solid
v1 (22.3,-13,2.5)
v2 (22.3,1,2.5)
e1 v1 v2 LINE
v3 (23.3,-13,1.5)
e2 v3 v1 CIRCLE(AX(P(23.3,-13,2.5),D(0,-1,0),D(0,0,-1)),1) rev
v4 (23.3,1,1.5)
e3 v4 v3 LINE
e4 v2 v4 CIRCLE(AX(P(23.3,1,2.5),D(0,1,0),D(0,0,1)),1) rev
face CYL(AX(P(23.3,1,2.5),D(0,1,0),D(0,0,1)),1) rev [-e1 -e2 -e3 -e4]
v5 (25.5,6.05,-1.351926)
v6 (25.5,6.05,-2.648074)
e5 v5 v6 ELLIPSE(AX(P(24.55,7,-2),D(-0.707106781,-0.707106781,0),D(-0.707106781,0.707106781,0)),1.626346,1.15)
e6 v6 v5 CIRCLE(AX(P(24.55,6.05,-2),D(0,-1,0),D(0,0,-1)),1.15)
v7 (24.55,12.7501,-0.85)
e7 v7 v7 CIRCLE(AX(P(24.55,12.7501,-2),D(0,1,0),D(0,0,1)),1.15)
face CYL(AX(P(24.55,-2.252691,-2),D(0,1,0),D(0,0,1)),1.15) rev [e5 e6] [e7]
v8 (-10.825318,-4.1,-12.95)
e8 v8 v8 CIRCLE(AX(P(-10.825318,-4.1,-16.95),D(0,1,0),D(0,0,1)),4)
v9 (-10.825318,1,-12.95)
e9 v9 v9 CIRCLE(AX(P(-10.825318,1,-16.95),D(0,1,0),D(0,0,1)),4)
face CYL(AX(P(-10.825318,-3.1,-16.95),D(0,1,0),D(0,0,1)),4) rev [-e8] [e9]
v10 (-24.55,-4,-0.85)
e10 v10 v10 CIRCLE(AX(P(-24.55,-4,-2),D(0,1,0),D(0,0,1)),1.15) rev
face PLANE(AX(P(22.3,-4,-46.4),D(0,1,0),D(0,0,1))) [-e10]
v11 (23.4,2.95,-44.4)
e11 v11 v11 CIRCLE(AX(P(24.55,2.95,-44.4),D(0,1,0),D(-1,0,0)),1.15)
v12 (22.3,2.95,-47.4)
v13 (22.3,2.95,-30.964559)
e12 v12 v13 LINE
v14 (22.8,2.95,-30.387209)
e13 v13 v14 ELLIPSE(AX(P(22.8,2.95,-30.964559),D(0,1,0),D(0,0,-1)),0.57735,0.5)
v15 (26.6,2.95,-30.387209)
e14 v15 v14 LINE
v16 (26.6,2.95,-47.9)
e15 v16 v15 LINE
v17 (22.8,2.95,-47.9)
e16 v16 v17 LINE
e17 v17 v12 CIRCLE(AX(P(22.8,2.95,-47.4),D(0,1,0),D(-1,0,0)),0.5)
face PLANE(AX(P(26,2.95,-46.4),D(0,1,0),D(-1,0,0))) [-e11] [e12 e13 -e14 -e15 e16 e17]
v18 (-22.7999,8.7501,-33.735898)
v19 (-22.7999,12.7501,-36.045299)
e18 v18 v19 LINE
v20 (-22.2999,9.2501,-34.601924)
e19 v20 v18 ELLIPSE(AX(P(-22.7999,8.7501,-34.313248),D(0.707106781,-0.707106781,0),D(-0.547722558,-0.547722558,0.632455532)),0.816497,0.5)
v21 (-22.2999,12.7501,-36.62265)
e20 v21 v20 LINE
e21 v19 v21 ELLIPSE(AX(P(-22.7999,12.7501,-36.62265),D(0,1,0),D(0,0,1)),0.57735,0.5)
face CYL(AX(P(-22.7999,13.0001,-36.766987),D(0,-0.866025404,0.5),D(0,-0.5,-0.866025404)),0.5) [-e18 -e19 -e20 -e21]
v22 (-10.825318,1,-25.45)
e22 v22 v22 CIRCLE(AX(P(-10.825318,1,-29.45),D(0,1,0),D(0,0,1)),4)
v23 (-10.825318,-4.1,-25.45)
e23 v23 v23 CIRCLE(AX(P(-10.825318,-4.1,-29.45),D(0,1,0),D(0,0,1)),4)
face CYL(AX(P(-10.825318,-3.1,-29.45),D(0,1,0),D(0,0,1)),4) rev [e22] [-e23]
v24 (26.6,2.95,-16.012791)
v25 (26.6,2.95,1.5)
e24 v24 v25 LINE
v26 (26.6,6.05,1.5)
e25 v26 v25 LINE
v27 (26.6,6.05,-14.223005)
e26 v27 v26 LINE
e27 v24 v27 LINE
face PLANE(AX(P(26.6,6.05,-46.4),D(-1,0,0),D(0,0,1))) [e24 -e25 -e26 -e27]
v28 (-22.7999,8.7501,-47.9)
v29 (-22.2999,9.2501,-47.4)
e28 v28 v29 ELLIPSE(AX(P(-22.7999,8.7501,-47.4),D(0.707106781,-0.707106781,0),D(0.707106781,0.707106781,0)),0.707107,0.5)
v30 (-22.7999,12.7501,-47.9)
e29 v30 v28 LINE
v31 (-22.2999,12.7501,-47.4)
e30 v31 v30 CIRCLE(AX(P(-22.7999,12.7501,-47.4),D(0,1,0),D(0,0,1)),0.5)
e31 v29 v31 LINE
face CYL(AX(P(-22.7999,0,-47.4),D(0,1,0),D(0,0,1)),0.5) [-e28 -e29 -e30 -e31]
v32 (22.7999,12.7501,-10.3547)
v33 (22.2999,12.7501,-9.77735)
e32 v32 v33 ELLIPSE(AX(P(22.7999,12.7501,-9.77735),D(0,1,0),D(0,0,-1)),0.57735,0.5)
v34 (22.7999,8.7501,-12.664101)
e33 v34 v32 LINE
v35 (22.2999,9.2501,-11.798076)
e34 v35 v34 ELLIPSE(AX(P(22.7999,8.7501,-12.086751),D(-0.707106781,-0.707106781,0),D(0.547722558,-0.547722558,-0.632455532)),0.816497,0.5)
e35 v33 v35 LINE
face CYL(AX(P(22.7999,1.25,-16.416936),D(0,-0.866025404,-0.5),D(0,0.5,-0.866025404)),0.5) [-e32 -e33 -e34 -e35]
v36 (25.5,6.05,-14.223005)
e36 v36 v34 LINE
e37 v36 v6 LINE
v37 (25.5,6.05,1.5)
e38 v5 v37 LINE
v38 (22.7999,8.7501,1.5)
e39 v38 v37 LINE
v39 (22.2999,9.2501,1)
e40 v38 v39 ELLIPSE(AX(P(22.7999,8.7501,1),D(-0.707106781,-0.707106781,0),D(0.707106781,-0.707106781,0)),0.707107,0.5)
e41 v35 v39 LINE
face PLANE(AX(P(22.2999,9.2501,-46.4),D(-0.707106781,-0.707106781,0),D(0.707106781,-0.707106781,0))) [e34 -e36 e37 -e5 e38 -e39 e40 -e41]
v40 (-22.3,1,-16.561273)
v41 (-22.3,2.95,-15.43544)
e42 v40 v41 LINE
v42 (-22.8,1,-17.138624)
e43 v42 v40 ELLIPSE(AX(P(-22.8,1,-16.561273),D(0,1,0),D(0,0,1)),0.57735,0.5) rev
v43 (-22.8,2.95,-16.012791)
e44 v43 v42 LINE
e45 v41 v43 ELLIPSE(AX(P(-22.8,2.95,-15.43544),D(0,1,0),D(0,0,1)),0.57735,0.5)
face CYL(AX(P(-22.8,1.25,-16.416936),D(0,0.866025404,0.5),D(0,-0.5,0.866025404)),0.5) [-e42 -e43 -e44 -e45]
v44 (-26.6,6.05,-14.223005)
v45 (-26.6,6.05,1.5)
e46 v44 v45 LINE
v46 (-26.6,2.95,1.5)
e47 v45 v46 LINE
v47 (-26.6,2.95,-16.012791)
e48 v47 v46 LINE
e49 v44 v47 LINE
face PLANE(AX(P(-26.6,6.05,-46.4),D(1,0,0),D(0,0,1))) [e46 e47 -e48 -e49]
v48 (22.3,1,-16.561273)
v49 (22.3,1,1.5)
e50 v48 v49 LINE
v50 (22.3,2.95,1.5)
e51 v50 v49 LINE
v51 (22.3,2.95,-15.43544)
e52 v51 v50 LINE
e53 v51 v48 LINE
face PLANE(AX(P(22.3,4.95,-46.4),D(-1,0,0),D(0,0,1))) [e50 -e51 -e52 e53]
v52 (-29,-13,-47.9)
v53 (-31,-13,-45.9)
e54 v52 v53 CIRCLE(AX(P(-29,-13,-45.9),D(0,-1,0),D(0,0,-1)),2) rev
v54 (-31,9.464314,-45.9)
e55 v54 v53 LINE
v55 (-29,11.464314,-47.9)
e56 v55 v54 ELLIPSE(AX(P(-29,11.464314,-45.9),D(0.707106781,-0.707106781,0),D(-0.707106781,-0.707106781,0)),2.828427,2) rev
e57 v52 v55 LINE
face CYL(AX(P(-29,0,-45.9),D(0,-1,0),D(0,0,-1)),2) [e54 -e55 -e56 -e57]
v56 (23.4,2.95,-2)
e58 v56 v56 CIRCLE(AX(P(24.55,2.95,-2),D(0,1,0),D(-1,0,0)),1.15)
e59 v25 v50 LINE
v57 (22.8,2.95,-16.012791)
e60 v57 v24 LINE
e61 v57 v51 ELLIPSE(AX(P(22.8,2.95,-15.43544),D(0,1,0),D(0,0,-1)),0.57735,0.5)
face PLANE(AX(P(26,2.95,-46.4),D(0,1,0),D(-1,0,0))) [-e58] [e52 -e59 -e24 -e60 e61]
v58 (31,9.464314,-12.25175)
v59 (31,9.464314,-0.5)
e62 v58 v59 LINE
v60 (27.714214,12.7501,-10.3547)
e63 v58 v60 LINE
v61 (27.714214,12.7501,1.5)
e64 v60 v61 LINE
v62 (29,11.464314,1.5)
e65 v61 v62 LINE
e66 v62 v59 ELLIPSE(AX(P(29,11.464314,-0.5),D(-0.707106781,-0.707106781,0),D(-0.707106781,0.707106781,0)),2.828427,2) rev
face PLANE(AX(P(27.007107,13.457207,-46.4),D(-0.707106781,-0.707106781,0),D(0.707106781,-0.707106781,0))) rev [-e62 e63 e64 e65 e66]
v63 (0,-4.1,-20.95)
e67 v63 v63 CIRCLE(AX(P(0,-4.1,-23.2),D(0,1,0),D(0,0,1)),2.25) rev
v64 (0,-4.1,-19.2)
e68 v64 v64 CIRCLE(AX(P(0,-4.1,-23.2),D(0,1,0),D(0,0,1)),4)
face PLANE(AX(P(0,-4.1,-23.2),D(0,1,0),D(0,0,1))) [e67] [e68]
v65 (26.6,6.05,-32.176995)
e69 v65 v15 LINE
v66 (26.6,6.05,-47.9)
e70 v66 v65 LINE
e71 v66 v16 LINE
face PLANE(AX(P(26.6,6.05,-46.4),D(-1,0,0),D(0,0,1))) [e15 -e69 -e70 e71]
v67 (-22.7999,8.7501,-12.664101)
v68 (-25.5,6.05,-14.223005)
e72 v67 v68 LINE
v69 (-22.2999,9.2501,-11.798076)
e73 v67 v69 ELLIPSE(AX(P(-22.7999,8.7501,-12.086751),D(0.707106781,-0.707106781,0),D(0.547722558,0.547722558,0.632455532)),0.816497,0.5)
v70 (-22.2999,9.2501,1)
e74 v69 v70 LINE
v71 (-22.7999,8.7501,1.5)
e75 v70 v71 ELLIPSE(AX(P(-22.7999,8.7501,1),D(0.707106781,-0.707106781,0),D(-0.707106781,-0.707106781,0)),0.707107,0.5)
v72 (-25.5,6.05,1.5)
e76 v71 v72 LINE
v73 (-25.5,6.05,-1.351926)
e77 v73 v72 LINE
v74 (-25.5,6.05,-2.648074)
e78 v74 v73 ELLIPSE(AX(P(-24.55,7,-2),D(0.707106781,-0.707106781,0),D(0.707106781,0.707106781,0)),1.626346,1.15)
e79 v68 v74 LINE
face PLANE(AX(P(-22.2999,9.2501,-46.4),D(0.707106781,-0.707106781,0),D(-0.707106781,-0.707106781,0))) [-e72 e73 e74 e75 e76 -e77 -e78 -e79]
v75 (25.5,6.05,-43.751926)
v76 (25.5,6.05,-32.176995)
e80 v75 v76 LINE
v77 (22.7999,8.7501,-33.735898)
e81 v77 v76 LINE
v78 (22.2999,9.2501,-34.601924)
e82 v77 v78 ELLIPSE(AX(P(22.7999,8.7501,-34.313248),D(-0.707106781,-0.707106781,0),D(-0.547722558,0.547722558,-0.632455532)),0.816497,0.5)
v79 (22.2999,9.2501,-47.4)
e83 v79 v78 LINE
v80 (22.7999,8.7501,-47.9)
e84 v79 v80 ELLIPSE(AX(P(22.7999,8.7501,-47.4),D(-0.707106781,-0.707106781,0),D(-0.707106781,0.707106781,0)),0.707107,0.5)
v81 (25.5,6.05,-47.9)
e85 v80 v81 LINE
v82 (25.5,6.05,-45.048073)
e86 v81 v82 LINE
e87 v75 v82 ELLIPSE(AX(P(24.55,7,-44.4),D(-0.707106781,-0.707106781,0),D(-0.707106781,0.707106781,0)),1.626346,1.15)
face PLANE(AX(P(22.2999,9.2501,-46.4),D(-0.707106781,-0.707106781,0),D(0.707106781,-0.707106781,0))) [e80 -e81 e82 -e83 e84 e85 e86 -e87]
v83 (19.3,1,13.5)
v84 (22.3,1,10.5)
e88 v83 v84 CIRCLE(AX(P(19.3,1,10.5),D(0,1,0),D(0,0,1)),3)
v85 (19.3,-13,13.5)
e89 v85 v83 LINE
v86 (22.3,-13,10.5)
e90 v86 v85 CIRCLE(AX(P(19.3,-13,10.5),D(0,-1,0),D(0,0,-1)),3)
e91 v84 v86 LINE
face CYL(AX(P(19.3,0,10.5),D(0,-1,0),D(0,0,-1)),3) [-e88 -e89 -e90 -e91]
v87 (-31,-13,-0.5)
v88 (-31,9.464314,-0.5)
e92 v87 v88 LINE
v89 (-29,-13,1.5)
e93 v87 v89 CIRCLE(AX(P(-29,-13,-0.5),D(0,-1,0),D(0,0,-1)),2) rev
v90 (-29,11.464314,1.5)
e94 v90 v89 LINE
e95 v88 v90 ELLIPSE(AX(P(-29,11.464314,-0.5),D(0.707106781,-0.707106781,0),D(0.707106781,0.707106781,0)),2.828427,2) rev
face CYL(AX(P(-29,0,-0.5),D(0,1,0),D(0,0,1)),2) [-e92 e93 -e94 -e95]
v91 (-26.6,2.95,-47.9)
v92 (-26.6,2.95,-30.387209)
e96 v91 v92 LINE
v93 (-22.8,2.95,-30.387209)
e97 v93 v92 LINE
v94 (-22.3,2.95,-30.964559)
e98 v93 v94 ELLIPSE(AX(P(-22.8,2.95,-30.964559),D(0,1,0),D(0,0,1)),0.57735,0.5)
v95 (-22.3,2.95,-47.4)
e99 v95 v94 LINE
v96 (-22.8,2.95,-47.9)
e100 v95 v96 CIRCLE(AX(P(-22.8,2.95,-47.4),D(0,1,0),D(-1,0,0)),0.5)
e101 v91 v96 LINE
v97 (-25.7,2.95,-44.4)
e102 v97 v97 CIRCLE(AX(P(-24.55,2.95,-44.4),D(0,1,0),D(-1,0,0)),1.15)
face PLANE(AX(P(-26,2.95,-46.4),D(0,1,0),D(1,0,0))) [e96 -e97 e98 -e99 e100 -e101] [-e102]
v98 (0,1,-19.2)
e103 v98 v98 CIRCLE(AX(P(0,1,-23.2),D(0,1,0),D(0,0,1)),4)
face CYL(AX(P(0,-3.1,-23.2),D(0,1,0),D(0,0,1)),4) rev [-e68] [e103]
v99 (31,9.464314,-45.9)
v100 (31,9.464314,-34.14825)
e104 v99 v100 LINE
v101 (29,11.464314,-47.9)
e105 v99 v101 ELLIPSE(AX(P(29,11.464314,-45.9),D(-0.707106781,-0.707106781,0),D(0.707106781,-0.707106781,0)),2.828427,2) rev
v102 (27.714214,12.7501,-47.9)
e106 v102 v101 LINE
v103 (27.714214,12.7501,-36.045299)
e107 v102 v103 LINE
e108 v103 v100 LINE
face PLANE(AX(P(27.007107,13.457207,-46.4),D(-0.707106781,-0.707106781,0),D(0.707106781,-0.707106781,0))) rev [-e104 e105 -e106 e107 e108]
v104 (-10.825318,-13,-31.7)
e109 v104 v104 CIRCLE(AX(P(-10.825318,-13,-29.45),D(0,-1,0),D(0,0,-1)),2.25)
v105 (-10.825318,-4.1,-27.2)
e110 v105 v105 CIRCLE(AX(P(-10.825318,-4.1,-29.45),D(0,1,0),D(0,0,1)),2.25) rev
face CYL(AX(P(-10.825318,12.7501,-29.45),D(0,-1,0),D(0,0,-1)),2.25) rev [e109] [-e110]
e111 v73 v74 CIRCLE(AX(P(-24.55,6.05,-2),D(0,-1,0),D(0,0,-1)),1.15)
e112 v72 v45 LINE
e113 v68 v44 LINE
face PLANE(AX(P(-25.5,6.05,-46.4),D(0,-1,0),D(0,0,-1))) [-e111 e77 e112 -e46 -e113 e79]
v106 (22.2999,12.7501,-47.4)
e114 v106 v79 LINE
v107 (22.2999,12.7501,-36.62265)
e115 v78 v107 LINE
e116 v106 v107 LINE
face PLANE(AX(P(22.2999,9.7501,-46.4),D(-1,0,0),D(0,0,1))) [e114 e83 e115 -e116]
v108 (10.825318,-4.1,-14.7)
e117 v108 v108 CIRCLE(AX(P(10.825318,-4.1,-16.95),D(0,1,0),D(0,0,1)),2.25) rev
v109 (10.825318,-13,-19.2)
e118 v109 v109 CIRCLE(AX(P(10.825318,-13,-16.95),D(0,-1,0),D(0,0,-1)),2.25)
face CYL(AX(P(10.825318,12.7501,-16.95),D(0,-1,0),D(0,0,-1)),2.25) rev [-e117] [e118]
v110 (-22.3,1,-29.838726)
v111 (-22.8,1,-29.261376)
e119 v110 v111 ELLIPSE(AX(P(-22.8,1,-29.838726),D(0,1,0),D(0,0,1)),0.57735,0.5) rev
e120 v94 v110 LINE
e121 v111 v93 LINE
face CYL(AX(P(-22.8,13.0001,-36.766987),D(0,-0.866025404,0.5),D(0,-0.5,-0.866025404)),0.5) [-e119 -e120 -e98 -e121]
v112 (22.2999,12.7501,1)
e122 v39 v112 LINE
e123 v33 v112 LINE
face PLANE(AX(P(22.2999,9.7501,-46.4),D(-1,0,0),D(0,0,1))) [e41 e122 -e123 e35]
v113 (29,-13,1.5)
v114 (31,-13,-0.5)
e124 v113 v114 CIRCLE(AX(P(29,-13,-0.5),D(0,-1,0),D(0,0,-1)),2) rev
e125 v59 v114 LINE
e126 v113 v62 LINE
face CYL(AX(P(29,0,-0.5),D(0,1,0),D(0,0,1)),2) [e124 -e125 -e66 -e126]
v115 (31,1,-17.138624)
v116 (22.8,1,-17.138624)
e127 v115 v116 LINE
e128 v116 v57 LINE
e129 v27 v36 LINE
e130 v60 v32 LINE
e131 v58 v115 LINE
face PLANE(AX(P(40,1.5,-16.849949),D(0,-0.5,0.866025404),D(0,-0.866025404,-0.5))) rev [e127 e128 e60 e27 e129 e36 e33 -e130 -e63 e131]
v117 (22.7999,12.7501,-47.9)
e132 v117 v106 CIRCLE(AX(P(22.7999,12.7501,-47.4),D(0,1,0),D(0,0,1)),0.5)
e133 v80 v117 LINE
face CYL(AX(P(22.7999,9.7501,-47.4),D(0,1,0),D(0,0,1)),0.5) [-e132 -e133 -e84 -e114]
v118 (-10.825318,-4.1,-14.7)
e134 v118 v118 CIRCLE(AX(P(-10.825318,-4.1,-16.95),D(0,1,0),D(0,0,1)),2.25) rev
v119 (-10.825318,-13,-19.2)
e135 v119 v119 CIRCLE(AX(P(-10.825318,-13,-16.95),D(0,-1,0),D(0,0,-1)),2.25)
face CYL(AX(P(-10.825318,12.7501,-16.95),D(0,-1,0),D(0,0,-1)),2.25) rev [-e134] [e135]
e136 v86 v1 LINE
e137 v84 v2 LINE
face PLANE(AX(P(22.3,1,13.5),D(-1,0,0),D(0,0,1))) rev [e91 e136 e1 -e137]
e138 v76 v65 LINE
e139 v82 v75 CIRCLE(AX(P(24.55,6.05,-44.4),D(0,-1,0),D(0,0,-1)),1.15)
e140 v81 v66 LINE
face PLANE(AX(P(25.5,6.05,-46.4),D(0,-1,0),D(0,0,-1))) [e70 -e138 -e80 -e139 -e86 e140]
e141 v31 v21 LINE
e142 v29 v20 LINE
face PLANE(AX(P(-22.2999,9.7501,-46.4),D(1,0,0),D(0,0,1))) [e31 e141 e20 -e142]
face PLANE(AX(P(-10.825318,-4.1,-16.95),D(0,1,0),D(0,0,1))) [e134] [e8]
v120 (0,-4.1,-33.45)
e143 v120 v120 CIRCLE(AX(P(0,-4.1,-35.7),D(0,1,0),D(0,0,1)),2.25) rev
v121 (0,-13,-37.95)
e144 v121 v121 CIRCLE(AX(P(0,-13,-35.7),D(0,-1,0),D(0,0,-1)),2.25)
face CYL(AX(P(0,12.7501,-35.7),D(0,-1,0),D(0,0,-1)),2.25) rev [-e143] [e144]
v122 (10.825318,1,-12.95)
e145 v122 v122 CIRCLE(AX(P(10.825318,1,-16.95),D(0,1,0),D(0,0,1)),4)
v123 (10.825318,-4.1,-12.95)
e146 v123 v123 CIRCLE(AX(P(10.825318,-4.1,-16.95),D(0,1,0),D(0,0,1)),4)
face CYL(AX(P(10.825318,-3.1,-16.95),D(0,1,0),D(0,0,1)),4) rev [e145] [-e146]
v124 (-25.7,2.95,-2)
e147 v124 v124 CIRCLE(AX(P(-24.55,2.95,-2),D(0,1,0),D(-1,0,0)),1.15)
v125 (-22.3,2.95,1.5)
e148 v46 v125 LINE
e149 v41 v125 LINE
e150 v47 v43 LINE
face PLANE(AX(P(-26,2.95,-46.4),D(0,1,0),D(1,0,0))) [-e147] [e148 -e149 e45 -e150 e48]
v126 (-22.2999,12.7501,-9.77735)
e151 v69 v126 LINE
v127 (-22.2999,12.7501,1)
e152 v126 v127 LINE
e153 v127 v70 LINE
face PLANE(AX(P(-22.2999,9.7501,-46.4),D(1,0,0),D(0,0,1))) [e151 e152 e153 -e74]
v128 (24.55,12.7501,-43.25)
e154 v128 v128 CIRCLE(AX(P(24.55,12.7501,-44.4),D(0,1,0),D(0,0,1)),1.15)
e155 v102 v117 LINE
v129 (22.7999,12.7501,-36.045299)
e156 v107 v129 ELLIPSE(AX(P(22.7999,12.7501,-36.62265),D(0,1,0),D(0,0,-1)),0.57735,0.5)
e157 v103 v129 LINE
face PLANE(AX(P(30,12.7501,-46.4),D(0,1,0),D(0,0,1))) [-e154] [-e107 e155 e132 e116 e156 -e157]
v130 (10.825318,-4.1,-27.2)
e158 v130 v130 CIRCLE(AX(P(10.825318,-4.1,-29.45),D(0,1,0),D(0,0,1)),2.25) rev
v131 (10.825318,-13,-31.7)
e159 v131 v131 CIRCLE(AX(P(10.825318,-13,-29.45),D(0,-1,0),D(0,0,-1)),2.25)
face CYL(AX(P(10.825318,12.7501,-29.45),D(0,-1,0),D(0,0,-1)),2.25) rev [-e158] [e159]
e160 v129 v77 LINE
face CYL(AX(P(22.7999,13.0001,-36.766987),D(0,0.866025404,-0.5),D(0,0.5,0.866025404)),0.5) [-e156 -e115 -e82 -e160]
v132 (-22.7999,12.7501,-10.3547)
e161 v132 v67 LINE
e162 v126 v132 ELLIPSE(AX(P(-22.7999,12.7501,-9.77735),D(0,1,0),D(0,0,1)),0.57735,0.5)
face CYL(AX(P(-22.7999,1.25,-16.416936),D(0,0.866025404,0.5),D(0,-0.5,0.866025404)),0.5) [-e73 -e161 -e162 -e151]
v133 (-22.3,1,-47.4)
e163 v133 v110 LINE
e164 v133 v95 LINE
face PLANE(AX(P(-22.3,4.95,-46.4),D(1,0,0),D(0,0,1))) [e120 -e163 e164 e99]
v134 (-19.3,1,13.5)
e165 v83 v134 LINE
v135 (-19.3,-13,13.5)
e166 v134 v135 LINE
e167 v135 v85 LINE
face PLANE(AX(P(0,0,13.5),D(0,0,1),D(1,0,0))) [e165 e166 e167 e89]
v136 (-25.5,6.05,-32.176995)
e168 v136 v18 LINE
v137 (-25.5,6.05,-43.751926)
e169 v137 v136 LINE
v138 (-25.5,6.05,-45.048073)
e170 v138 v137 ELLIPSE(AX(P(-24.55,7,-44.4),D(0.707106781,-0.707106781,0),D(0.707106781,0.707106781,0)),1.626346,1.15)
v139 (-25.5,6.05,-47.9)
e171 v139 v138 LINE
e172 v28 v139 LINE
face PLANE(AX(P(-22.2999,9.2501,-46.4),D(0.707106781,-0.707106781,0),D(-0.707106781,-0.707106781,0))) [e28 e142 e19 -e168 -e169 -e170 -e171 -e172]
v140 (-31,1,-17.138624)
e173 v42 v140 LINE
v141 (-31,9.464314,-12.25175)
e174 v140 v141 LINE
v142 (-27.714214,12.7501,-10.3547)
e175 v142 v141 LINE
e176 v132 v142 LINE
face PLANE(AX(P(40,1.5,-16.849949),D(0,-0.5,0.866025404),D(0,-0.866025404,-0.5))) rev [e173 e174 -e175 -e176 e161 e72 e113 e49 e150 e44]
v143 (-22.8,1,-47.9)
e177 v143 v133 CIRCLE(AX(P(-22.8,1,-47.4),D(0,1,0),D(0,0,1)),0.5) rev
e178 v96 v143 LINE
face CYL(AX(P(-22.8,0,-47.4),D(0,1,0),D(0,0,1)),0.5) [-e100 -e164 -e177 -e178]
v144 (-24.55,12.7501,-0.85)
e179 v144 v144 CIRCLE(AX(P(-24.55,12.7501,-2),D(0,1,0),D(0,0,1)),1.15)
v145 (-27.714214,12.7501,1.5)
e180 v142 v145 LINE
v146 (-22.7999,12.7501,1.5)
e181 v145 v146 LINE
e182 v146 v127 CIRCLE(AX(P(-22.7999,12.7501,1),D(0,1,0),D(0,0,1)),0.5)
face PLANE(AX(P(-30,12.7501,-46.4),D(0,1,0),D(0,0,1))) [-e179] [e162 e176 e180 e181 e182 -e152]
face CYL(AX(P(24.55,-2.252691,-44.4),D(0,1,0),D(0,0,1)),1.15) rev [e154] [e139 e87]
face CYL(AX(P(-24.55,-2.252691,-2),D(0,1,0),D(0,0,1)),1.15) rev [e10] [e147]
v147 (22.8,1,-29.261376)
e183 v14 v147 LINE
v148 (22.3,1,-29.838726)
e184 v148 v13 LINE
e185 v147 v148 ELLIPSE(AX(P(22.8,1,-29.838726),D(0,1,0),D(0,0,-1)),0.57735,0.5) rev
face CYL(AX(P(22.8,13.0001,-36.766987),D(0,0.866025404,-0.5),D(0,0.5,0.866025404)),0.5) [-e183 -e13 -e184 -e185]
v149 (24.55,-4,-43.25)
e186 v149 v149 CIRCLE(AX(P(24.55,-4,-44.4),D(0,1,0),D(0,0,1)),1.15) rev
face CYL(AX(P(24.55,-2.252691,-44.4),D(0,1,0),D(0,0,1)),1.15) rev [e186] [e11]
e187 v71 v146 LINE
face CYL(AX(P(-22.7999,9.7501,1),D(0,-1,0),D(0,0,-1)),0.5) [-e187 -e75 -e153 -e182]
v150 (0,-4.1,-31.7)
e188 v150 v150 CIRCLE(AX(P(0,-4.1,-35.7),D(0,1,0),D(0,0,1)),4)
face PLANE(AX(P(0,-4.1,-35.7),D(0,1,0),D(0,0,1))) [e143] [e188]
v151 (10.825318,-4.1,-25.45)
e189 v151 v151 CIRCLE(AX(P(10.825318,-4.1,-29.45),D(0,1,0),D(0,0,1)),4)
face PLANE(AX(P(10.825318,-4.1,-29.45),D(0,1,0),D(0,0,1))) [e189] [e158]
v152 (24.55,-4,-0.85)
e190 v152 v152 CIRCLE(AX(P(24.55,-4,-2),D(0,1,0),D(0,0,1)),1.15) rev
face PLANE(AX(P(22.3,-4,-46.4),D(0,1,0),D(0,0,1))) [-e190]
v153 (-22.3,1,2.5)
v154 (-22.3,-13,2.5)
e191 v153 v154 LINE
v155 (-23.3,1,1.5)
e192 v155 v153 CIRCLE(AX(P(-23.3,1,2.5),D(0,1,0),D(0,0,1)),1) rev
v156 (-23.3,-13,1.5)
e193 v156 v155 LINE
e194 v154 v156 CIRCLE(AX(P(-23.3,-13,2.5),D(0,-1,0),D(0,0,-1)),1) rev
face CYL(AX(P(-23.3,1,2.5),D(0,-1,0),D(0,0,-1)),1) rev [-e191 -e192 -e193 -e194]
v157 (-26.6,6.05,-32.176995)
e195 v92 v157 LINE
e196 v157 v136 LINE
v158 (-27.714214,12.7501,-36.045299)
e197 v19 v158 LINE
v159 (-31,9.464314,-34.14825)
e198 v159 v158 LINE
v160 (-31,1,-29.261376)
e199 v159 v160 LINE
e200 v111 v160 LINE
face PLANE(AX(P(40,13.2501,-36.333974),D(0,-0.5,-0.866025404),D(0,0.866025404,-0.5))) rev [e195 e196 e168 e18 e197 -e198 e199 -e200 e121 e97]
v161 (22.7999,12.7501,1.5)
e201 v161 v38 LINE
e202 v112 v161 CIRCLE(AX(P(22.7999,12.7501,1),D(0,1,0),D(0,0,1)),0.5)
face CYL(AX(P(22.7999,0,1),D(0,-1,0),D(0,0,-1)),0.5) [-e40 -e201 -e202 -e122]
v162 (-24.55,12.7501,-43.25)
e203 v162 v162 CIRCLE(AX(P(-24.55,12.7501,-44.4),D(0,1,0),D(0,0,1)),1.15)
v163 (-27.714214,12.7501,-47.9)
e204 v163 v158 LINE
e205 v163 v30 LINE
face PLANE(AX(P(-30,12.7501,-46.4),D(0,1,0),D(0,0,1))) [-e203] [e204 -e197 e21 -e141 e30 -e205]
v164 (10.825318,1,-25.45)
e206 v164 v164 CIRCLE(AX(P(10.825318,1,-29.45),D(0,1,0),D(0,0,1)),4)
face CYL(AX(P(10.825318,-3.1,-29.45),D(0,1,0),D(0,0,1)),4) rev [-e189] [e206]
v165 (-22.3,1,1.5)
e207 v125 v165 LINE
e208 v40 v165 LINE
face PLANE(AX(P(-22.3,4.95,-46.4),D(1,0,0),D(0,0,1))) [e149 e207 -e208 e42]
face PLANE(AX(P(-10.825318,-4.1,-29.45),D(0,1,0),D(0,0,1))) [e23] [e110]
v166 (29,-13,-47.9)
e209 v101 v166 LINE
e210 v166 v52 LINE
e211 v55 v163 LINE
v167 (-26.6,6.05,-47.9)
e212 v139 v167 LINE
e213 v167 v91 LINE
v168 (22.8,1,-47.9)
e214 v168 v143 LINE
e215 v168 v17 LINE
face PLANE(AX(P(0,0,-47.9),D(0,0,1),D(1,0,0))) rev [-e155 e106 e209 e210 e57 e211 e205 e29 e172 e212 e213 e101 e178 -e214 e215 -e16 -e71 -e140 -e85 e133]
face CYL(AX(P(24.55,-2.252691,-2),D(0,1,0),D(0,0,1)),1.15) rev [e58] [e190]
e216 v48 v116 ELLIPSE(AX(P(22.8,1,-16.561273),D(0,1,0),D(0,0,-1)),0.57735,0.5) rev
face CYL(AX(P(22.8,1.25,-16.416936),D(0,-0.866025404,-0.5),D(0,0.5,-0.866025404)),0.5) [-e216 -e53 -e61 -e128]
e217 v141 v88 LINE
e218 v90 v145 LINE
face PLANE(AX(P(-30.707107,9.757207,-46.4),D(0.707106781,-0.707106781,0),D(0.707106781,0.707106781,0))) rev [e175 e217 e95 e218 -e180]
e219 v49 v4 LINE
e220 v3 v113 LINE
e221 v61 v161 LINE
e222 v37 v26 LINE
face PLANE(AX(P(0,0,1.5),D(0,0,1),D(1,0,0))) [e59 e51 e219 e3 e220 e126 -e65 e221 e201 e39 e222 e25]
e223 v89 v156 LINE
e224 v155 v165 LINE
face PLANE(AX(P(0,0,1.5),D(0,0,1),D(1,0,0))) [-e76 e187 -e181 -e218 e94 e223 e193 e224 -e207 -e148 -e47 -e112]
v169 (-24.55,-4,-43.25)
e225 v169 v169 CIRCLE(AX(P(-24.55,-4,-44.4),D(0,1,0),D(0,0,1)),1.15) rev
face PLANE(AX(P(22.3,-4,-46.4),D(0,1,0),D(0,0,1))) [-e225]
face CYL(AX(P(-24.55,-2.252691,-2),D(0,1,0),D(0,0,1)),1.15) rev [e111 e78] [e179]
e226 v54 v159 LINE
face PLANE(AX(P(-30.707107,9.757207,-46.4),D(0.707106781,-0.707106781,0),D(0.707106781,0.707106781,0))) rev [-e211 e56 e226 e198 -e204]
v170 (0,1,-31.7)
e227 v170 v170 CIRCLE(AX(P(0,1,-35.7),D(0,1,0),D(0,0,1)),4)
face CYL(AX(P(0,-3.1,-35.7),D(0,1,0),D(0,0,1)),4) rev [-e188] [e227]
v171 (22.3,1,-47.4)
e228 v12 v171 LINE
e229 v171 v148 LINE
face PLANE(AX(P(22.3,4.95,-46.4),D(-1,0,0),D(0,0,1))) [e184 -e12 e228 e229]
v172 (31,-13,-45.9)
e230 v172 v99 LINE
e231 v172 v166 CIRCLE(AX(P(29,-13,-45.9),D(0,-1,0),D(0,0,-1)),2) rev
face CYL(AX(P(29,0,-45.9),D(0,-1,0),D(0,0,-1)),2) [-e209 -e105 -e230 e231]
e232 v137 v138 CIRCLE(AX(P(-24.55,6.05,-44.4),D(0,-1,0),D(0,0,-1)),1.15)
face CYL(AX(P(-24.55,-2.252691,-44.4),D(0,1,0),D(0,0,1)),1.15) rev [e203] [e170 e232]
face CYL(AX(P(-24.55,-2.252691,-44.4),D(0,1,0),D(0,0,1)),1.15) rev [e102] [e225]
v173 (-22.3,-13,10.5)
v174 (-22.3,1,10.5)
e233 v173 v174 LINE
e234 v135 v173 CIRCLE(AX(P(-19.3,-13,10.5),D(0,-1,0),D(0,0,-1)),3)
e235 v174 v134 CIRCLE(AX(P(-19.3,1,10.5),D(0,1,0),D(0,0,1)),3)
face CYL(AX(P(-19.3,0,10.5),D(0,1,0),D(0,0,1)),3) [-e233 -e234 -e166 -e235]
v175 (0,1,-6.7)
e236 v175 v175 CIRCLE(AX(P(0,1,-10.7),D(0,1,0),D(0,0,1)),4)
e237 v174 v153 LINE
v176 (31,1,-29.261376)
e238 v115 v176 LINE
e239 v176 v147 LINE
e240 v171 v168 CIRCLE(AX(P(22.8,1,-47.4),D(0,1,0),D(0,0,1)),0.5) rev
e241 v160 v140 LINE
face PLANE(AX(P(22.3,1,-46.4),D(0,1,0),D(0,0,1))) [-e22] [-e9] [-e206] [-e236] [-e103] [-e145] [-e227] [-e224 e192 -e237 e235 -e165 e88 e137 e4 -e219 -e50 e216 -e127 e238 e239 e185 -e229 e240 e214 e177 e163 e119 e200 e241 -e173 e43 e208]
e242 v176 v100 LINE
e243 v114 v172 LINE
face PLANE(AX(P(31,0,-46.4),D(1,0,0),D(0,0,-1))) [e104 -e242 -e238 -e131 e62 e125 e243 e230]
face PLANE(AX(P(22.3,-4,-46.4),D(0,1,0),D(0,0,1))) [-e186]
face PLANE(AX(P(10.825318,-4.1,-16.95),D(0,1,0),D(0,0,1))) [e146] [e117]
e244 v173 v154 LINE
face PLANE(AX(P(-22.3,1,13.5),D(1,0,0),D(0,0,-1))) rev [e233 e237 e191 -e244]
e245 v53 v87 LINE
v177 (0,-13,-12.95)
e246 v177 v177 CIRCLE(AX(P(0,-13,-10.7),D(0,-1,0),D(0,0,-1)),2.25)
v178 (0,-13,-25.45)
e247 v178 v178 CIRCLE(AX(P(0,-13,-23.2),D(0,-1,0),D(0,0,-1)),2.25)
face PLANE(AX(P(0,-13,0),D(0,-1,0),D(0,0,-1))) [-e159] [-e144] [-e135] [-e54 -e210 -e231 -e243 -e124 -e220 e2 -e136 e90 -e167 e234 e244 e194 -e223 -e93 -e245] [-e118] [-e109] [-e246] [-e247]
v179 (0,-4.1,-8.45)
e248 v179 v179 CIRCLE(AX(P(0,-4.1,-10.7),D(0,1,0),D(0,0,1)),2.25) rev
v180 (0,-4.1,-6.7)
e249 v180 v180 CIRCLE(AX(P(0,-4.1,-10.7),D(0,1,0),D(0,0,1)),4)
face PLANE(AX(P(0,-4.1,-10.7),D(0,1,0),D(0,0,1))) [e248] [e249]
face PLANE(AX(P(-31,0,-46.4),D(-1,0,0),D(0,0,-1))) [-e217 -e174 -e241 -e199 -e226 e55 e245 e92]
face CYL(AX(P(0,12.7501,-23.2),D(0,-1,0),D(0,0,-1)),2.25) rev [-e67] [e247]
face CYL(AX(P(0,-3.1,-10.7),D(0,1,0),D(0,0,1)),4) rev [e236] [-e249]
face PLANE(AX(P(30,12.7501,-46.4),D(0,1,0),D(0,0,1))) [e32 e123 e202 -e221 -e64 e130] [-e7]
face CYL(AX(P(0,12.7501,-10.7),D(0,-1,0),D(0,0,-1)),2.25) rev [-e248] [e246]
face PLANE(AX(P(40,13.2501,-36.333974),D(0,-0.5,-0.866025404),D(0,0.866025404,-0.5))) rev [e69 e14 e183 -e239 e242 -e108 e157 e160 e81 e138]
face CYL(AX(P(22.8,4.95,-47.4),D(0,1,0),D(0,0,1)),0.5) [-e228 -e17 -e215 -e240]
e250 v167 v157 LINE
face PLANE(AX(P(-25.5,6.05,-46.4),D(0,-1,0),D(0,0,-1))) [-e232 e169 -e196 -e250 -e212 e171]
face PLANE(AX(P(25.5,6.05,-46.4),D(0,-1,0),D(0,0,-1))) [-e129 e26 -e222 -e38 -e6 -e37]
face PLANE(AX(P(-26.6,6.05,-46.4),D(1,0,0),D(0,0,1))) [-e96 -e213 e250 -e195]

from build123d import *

# Parameters (mm, degrees)
BOSS_EXTRUDE1_DEPTH      = 46.39999966
CUT_EXTRUDE1_REACH       = 58.706
SKETCH2_R                = 1.15
CUT_EXTRUDE2_DEPTH       = 57.705599534
SKETCH4_W                = 80
SKETCH4_H                = 80
BOSS_EXTRUDE2_DEPTH      = 4
CUT_EXTRUDE3_DEPTH       = 96.167247667
MOVE_START               = -46.89999966
MOVE_FACE1_DEPTH         = 0.5
MOVE_FACE1_2_DEPTH       = 0.5
MOVE_START_2             = -31
MOVE_FACE5_DEPTH         = 5
MOVE_START_3             = 26
MOVE_FACE5_2_DEPTH       = 5
MOVE_START_4             = -26
MOVE_FACE5_3_OUTLINE_W   = 6.7001
MOVE_FACE5_3_OUTLINE_H   = 1
MOVE_FACE5_3_OUTLINE_W_2 = 3.95
MOVE_FACE5_3_DEPTH       = 3.7
MOVE_START_5             = 22.3
MOVE_FACE5_4_OUTLINE_W   = 6.7001
MOVE_FACE5_4_OUTLINE_H   = 1
MOVE_FACE5_4_OUTLINE_W_2 = 3.95
MOVE_FACE5_4_DEPTH       = 3.7
MOVE_START_6             = -22.3
MOVE_FACE5_5_OUTLINE_W   = 6.7001
MOVE_FACE5_5_OUTLINE_H   = 1
MOVE_FACE5_5_DEPTH       = 0.0001
MOVE_START_7             = 22.2999
MOVE_FACE5_6_OUTLINE_W   = 6.7001
MOVE_FACE5_6_OUTLINE_H   = 1
MOVE_FACE5_6_DEPTH       = 0.0001
MOVE_START_8             = -47.89999966
MOVE_FACE5_7_DEPTH       = 49.39999966
FILLET2_R                = 2
FILLET3_R                = 0.5
MOVE_FACE2_BY            = 0.5
MOVE_FACE2_2_BY          = 0.5
MOVE_FACE2_3_BY          = 0.5
MOVE_FACE2_4_BY          = 0.5
MOVE_START_9             = 2.95
MOVE_FACE3_OUTLINE_R     = 1.15
MOVE_FACE3_DEPTH         = 2
MOVE_FACE4_BY            = 2
MOVE_FACE6_BY            = 5
MOVE_FACE6_2_BY          = 5
MOVE_FACE6_3_BY          = 5
MOVE_FACE6_4_BY          = 5
MOVE_FACE13_BY           = 0.1
MOVE_FACE13_2_BY         = 0.1
MOVE_FACE13_3_BY         = 0.1
MOVE_FACE13_4_BY         = 0.1
SKETCH19_R               = 2.25
CUT_EXTRUDE11_DEPTH      = 77.872010696
SKETCH20_R               = 4
CUT_EXTRUDE12_DEPTH      = 4.1
SKETCH21_W               = 80
SKETCH21_H               = 80
CUT_EXTRUDE13_DEPTH      = 76.711986029
MOVE_FACE14_BY           = 1
MOVE_FACE14_2_BY         = 1
MOVE_FACE14_3_BY         = 1
MOVE_FACE14_4_BY         = 1
MOVE_FACE14_5_BY         = 1
MOVE_FACE14_6_BY         = 1
MOVE_FACE14_7_BY         = 1
DELETEFACE2_DEPTH        = 2.95
SKETCH23_W               = 44.6
SKETCH23_H               = 6
BOSS_EXTRUDE6_DEPTH      = 12
FILLET7_R                = 1
FILLET8_R                = 3
MOVE_FACE15_BY           = 8


with BuildPart() as part:
    # Sketch1 → Boss-Extrude1 (new body)
    with BuildSketch(Plane.XY):
        Polygon((0, 0), (30, 0), (30, 12.7501), (22.2999, 12.7501), (22.2999, 9.7501), (22.2999, 9.2501), (25.5, 6.05), (26, 6.05), (26, 4.95), (22.3, 4.95), (22.3, 1), (0, 1), align=None)
    extrude(amount=-BOSS_EXTRUDE1_DEPTH)

    # Mirror1: part across plane


with BuildPart() as part_1:
    add(part.part)
    add(part.part.mirror(Plane(origin=(0, 1, -46.39999966), x_dir=(0, 0, 1), z_dir=(-1, 0, 0))))

    # Cut-Extrude1: up to this face of the body (flat: up to its plane)
    cut_extrude1_end = Plane(part_1.part.faces().sort_by_distance((0, 1, -23.19999983))[0])
    # Sketch2 → Cut-Extrude1 (cut, up to the picked face)
    with BuildSketch(Plane(origin=(0, 12.7501, 0), x_dir=(1, 0, 0), z_dir=(0, 1, 0)), mode=Mode.PRIVATE) as cut_extrude1_sk1:
        with Locations(Location((-24.549999831, 44.399999661, 0), (0, 0, 270))):
            Circle(SKETCH2_R)
    cut_extrude1_tool1 = split(extrude(cut_extrude1_sk1.sketch, amount=-CUT_EXTRUDE1_REACH, mode=Mode.PRIVATE), bisect_by=cut_extrude1_end, keep=Keep.BOTH, mode=Mode.PRIVATE)
    # Sketch2 → Cut-Extrude1 (cut, up to the picked face)
    with BuildSketch(Plane(origin=(0, 12.7501, 0), x_dir=(1, 0, 0), z_dir=(0, 1, 0)), mode=Mode.PRIVATE) as cut_extrude1_sk2:
        with Locations(Location((-24.549999831, 1.999999999, 0), (0, 0, 270))):
            Circle(SKETCH2_R)
    cut_extrude1_tool2 = split(extrude(cut_extrude1_sk2.sketch, amount=-CUT_EXTRUDE1_REACH, mode=Mode.PRIVATE), bisect_by=cut_extrude1_end, keep=Keep.BOTH, mode=Mode.PRIVATE)
    # Sketch2 → Cut-Extrude1 (cut, up to the picked face)
    with BuildSketch(Plane(origin=(0, 12.7501, 0), x_dir=(1, 0, 0), z_dir=(0, 1, 0)), mode=Mode.PRIVATE) as cut_extrude1_sk3:
        with Locations(Location((24.549999831, 1.999999999, 0), (0, 0, 270))):
            Circle(SKETCH2_R)
    cut_extrude1_tool3 = split(extrude(cut_extrude1_sk3.sketch, amount=-CUT_EXTRUDE1_REACH, mode=Mode.PRIVATE), bisect_by=cut_extrude1_end, keep=Keep.BOTH, mode=Mode.PRIVATE)
    # Sketch2 → Cut-Extrude1 (cut, up to the picked face)
    with BuildSketch(Plane(origin=(0, 12.7501, 0), x_dir=(1, 0, 0), z_dir=(0, 1, 0)), mode=Mode.PRIVATE) as cut_extrude1_sk4:
        with Locations(Location((24.549999831, 44.399999661, 0), (0, 0, 270))):
            Circle(SKETCH2_R)
    cut_extrude1_tool4 = split(extrude(cut_extrude1_sk4.sketch, amount=-CUT_EXTRUDE1_REACH, mode=Mode.PRIVATE), bisect_by=cut_extrude1_end, keep=Keep.BOTH, mode=Mode.PRIVATE)
    add(cut_extrude1_tool1.solids().sort_by(Axis((-24.55, 12.7501, -44.4), (0, -1, 0)))[0], mode=Mode.SUBTRACT)
    add(cut_extrude1_tool2.solids().sort_by(Axis((-24.55, 12.7501, -2), (0, -1, 0)))[0], mode=Mode.SUBTRACT)
    add(cut_extrude1_tool3.solids().sort_by(Axis((24.55, 12.7501, -2), (0, -1, 0)))[0], mode=Mode.SUBTRACT)
    add(cut_extrude1_tool4.solids().sort_by(Axis((24.55, 12.7501, -44.4), (0, -1, 0)))[0], mode=Mode.SUBTRACT)

    # Sketch3 → Cut-Extrude2 (cut, through all)
    with BuildSketch(Plane.XY):
        Polygon((26.3, 12.7501), (30, 9.0501), (30, 12.7501), align=None)
        Polygon((-30, 12.7501), (-30, 9.0501), (-26.3, 12.7501), align=None)
    extrude(amount=-CUT_EXTRUDE2_DEPTH, mode=Mode.SUBTRACT)

    # Sketch4 → Boss-Extrude2 (add)
    with BuildSketch(Plane.XZ.offset(-1)):
        with Locations((0, -23.19999983)):
            Rectangle(SKETCH4_W, SKETCH4_H)
    extrude(amount=BOSS_EXTRUDE2_DEPTH)

    # Sketch5 → Cut-Extrude3 (cut, through all)
    with BuildSketch(Plane.ZY.offset(30)):
        Polygon((-37.19999983, 12.7501), (-30.416076432, 1), (-15.983923228, 1), (-9.19999983, 12.7501), align=None)
    extrude(amount=-CUT_EXTRUDE3_DEPTH, mode=Mode.SUBTRACT)

    # Move Face1: read off the stored shape, not the designer's step
    # Move Face1 outline → Move Face1 (add)
    with BuildSketch(Plane.XY.offset(MOVE_START)):
        Polygon((22.3, 1), (30, 1), (30, 9.0501), (26.3, 12.7501), (22.2999, 12.7501), (22.2999, 9.2501), (25.5, 6.05), (26, 6.05), (26, 4.95), (22.3, 4.95), align=None)
        Polygon((-30, 1), (-22.3, 1), (-22.3, 4.95), (-26, 4.95), (-26, 6.05), (-25.5, 6.05), (-22.2999, 9.2501), (-22.2999, 12.7501), (-26.3, 12.7501), (-30, 9.0501), align=None)
    extrude(amount=MOVE_FACE1_DEPTH)

    # Move Face1 2 outline → Move Face1 2 (add)
    with BuildSketch(Plane.XY):
        Polygon((22.3, 1), (30, 1), (30, 9.0501), (26.3, 12.7501), (22.2999, 12.7501), (22.2999, 9.2501), (25.5, 6.05), (26, 6.05), (26, 4.95), (22.3, 4.95), align=None)
        Polygon((-30, 1), (-22.3, 1), (-22.3, 4.95), (-26, 4.95), (-26, 6.05), (-25.5, 6.05), (-22.2999, 9.2501), (-22.2999, 12.7501), (-26.3, 12.7501), (-30, 9.0501), align=None)
    extrude(amount=MOVE_FACE1_2_DEPTH)

    # Move Face5: read off the stored shape, not the designer's step
    # Move Face5 outline → Move Face5 (add)
    with BuildSketch(Plane.YZ.offset(MOVE_START_2)):
        Polygon((12.7501, -10.354700368), (12.7501, 1.5), (1, 1.5), (1, -17.138623766), align=None)
        Polygon((1, -29.261375894), (1, -47.89999966), (12.7501, -47.89999966), (12.7501, -36.045299292), align=None)
    extrude(amount=MOVE_FACE5_DEPTH)

    # Move Face5 2 outline → Move Face5 2 (add)
    with BuildSketch(Plane.YZ.offset(MOVE_START_3)):
        Polygon((12.7501, -10.354700368), (12.7501, 1.5), (1, 1.5), (1, -17.138623766), align=None)
        Polygon((1, -29.261375894), (1, -47.89999966), (12.7501, -47.89999966), (12.7501, -36.045299292), align=None)
    extrude(amount=MOVE_FACE5_2_DEPTH)

    # Move Face5 3 outline → Move Face5 3 (add)
    with BuildSketch(Plane.YZ.offset(MOVE_START_4)):
        Polygon((6.05, -14.223004907), (12.7501, -10.354700368), (12.7501, -9.19999983), (6.05, -13.068304369), align=None)
        Polygon((4.95, -31.541909457), (1, -29.261375894), (1, -30.416076432), (4.95, -32.696609995), align=None)
        with Locations((9.40005, 1)):
            Rectangle(MOVE_FACE5_3_OUTLINE_W, MOVE_FACE5_3_OUTLINE_H)
        Polygon((1, -17.138623766), (4.95, -14.858090203), (4.95, -13.703389665), (1, -15.983923228), align=None)
        with Locations((2.975, 1)):
            Rectangle(MOVE_FACE5_3_OUTLINE_W_2, MOVE_FACE5_3_OUTLINE_H)
        Polygon((12.7501, -36.045299292), (6.05, -32.176994753), (6.05, -33.331695291), (12.7501, -37.19999983), align=None)
        with Locations((2.975, -47.39999966)):
            Rectangle(MOVE_FACE5_3_OUTLINE_W_2, MOVE_FACE5_3_OUTLINE_H)
        with Locations((9.40005, -47.39999966)):
            Rectangle(MOVE_FACE5_3_OUTLINE_W, MOVE_FACE5_3_OUTLINE_H)
    extrude(amount=MOVE_FACE5_3_DEPTH)

    # Move Face5 4 outline → Move Face5 4 (add)
    with BuildSketch(Plane.YZ.offset(MOVE_START_5)):
        Polygon((6.05, -14.223004907), (12.7501, -10.354700368), (12.7501, -9.19999983), (6.05, -13.068304369), align=None)
        Polygon((4.95, -31.541909457), (1, -29.261375894), (1, -30.416076432), (4.95, -32.696609995), align=None)
        with Locations((9.40005, 1)):
            Rectangle(MOVE_FACE5_4_OUTLINE_W, MOVE_FACE5_4_OUTLINE_H)
        Polygon((1, -17.138623766), (4.95, -14.858090203), (4.95, -13.703389665), (1, -15.983923228), align=None)
        with Locations((2.975, 1)):
            Rectangle(MOVE_FACE5_4_OUTLINE_W_2, MOVE_FACE5_4_OUTLINE_H)
        Polygon((12.7501, -36.045299292), (6.05, -32.176994753), (6.05, -33.331695291), (12.7501, -37.19999983), align=None)
        with Locations((2.975, -47.39999966)):
            Rectangle(MOVE_FACE5_4_OUTLINE_W_2, MOVE_FACE5_4_OUTLINE_H)
        with Locations((9.40005, -47.39999966)):
            Rectangle(MOVE_FACE5_4_OUTLINE_W, MOVE_FACE5_4_OUTLINE_H)
    extrude(amount=MOVE_FACE5_4_DEPTH)

    # Move Face5 5 outline → Move Face5 5 (add)
    with BuildSketch(Plane.YZ.offset(MOVE_START_6)):
        Polygon((6.05, -14.223004907), (12.7501, -10.354700368), (12.7501, -9.19999983), (6.05, -13.068304369), align=None)
        with Locations((9.40005, 1)):
            Rectangle(MOVE_FACE5_5_OUTLINE_W, MOVE_FACE5_5_OUTLINE_H)
        Polygon((12.7501, -36.045299292), (6.05, -32.176994753), (6.05, -33.331695291), (12.7501, -37.19999983), align=None)
        with Locations((9.40005, -47.39999966)):
            Rectangle(MOVE_FACE5_5_OUTLINE_W, MOVE_FACE5_5_OUTLINE_H)
    extrude(amount=MOVE_FACE5_5_DEPTH)

    # Move Face5 6 outline → Move Face5 6 (add)
    with BuildSketch(Plane.YZ.offset(MOVE_START_7)):
        Polygon((6.05, -14.223004907), (12.7501, -10.354700368), (12.7501, -9.19999983), (6.05, -13.068304369), align=None)
        with Locations((9.40005, 1)):
            Rectangle(MOVE_FACE5_6_OUTLINE_W, MOVE_FACE5_6_OUTLINE_H)
        Polygon((12.7501, -36.045299292), (6.05, -32.176994753), (6.05, -33.331695291), (12.7501, -37.19999983), align=None)
        with Locations((9.40005, -47.39999966)):
            Rectangle(MOVE_FACE5_6_OUTLINE_W, MOVE_FACE5_6_OUTLINE_H)
    extrude(amount=MOVE_FACE5_6_DEPTH)

    # Move Face5 7 outline → Move Face5 7 (cut)
    with BuildSketch(Plane.XY.offset(MOVE_START_8)):
        Polygon((31, 12.7501), (27.714213562, 12.7501), (31, 9.464313562), align=None)
        Polygon((25.5, 6.05), (22.2999, 9.2501), (22.2999, 6.05), align=None)
        Polygon((-31, 9.464313562), (-27.714213562, 12.7501), (-31, 12.7501), align=None)
        Polygon((-22.2999, 9.2501), (-25.5, 6.05), (-22.2999, 6.05), align=None)
    extrude(amount=MOVE_FACE5_7_DEPTH, mode=Mode.SUBTRACT)

    # Fillet2
    fillet2_edges = [part_1.edges().sort_by_distance(p)[0] for p in [
        (-31, 5.232156781, -47.89999966),
        (-31, 5.232156781, 1.5),
        (31, 5.232156781, 1.5),
        (31, 5.232156781, -47.89999966),
    ]]
    fillet(fillet2_edges, radius=FILLET2_R)

    # Fillet3
    fillet3_edges = [part_1.edges().sort_by_distance(p)[0] for p in [
        (22.3, 2.975, 1.5),
        (22.2999, 11.0001, 1.5),
        (22.3, 2.975, -15.998356984),
        (22.2999, 11.0001, -11.365063339),
        (-22.2999, 11.0001, -11.365063339),
        (-22.3, 2.975, -15.998356984),
        (22.3, 2.975, -30.401642675),
        (-22.3, 2.975, -30.401642675),
        (-22.2999, 11.0001, -35.034936321),
        (22.2999, 11.0001, -35.034936321),
        (22.2999, 11.0001, -47.89999966),
        (-22.3, 2.975, 1.5),
        (-22.2999, 11.0001, 1.5),
        (-22.2999, 11.0001, -47.89999966),
        (-22.3, 2.975, -47.89999966),
        (22.3, 2.975, -47.89999966),
    ]]
    fillet(fillet3_edges, radius=FILLET3_R)

    # Move Face2: a face moved inward by 0.5
    extrude(part_1.faces().sort_by_distance((26, 5.496370688, -6.52132147))[0], amount=MOVE_FACE2_BY, dir=(1, 0, 0), mode=Mode.SUBTRACT)

    # Move Face2 2: a face moved inward by 0.5
    extrude(part_1.faces().sort_by_distance((26, 5.496370688, -39.87867819))[0], amount=MOVE_FACE2_2_BY, dir=(1, 0, 0), mode=Mode.SUBTRACT)

    # Move Face2 3: a face moved inward by 0.5
    extrude(part_1.faces().sort_by_distance((-26, 5.496370688, -39.87867819))[0], amount=MOVE_FACE2_3_BY, dir=(-1, 0, 0), mode=Mode.SUBTRACT)

    # Move Face2 4: a face moved inward by 0.5
    extrude(part_1.faces().sort_by_distance((-26, 5.496370688, -6.52132147))[0], amount=MOVE_FACE2_4_BY, dir=(-1, 0, 0), mode=Mode.SUBTRACT)

    # Move Face3: read off the stored shape, not the designer's step
    # Move Face3 outline → Move Face3 (cut)
    # profile 1 of 2: a face of its own
    with BuildSketch(Plane(origin=(0, 0, 0), x_dir=(1, 0, 0), z_dir=(0, 1, 0)).offset(MOVE_START_9)):
        with BuildLine():
            Line((26.5, -1.5), (26.5, 47.89999966))
            Line((26.5, 47.89999966), (22.8, 47.89999966))
            ThreePointArc((22.8, 47.89999966), (22.446446609, 47.753553051), (22.3, 47.39999966))
            Line((22.3, 47.39999966), (22.3, -1))
            ThreePointArc((22.3, -1), (22.446446609, -1.353553391), (22.8, -1.5))
            Line((22.8, -1.5), (26.5, -1.5))
        make_face()
        with Locations((24.549999831, 1.999999999)):
            Circle(MOVE_FACE3_OUTLINE_R, mode=Mode.SUBTRACT)
        with Locations((24.549999831, 44.399999661)):
            Circle(MOVE_FACE3_OUTLINE_R, mode=Mode.SUBTRACT)
    # profile 2 of 2: a face of its own
    with BuildSketch(Plane(origin=(0, 0, 0), x_dir=(1, 0, 0), z_dir=(0, 1, 0)).offset(MOVE_START_9)):
        with BuildLine():
            ThreePointArc((-22.8, -1.5), (-22.446446609, -1.353553391), (-22.3, -1))
            Line((-22.3, -1), (-22.3, 47.39999966))
            ThreePointArc((-22.3, 47.39999966), (-22.446446609, 47.753553051), (-22.8, 47.89999966))
            Line((-22.8, 47.89999966), (-26.5, 47.89999966))
            Line((-26.5, 47.89999966), (-26.5, -1.5))
            Line((-26.5, -1.5), (-22.8, -1.5))
        make_face()
        with Locations((-24.549999831, 1.999999999)):
            Circle(MOVE_FACE3_OUTLINE_R, mode=Mode.SUBTRACT)
        with Locations((-24.549999831, 44.399999661)):
            Circle(MOVE_FACE3_OUTLINE_R, mode=Mode.SUBTRACT)
    extrude(amount=MOVE_FACE3_DEPTH, mode=Mode.SUBTRACT)

    # Move Face4: a face moved outward by 2.0
    extrude(part_1.faces().sort_by_distance((0, -3, -23.19999983))[0], amount=MOVE_FACE4_BY, dir=(0, -1, 0))

    # Move Face6: a face moved inward by 5.0
    extrude(part_1.faces().sort_by_distance((24.549999831, 1, -1.999999999))[0], amount=MOVE_FACE6_BY, dir=(0, -1, 0), mode=Mode.SUBTRACT)

    # Move Face6 2: a face moved inward by 5.0
    extrude(part_1.faces().sort_by_distance((24.549999831, 1, -44.399999661))[0], amount=MOVE_FACE6_2_BY, dir=(0, -1, 0), mode=Mode.SUBTRACT)

    # Move Face6 3: a face moved inward by 5.0
    extrude(part_1.faces().sort_by_distance((-24.549999831, 1, -44.399999661))[0], amount=MOVE_FACE6_3_BY, dir=(0, -1, 0), mode=Mode.SUBTRACT)

    # Move Face6 4: a face moved inward by 5.0
    extrude(part_1.faces().sort_by_distance((-24.549999831, 1, -1.999999999))[0], amount=MOVE_FACE6_4_BY, dir=(0, -1, 0), mode=Mode.SUBTRACT)

    # Move Face13: a face moved inward by 0.1
    extrude(part_1.faces().sort_by_distance((26.5, 4.472176906, -6.816980748))[0], amount=MOVE_FACE13_BY, dir=(1, 0, 0), mode=Mode.SUBTRACT)

    # Move Face13 2: a face moved inward by 0.1
    extrude(part_1.faces().sort_by_distance((26.5, 4.472176906, -39.583018912))[0], amount=MOVE_FACE13_2_BY, dir=(1, 0, 0), mode=Mode.SUBTRACT)

    # Move Face13 3: a face moved inward by 0.1
    extrude(part_1.faces().sort_by_distance((-26.5, 4.472176906, -39.583018912))[0], amount=MOVE_FACE13_3_BY, dir=(-1, 0, 0), mode=Mode.SUBTRACT)

    # Move Face13 4: a face moved inward by 0.1
    extrude(part_1.faces().sort_by_distance((-26.5, 4.472176906, -6.816980748))[0], amount=MOVE_FACE13_4_BY, dir=(-1, 0, 0), mode=Mode.SUBTRACT)

    # Sketch19 → Cut-Extrude11 (cut, through all)
    with BuildSketch(Plane.XZ.offset(5)):
        with Locations(Location((0, -23.19999983, 0), (0, 0, 270))):
            Circle(SKETCH19_R)
        with Locations(Location((0, -10.69999983, 0), (0, 0, 270))):
            Circle(SKETCH19_R)
        with Locations(Location((0, -35.69999983, 0), (0, 0, 270))):
            Circle(SKETCH19_R)
        with Locations(Location((10.825317547, -29.44999983, 0), (0, 0, 270))):
            Circle(SKETCH19_R)
        with Locations(Location((10.825317547, -16.94999983, 0), (0, 0, 270))):
            Circle(SKETCH19_R)
        with Locations(Location((-10.825317547, -16.94999983, 0), (0, 0, 270))):
            Circle(SKETCH19_R)
        with Locations(Location((-10.825317547, -29.44999983, 0), (0, 0, 270))):
            Circle(SKETCH19_R)
    extrude(amount=-CUT_EXTRUDE11_DEPTH, mode=Mode.SUBTRACT)

    # Sketch20 → Cut-Extrude12 (cut)
    with BuildSketch(Plane(origin=(0, 1, 0), x_dir=(1, 0, 0), z_dir=(0, 1, 0))):
        with Locations(Location((-10.825317547, 29.44999983, 0), (0, 0, 270))):
            Circle(SKETCH20_R)
        with Locations(Location((0, 23.19999983, 0), (0, 0, 270))):
            Circle(SKETCH20_R)
        with Locations(Location((0, 35.69999983, 0), (0, 0, 270))):
            Circle(SKETCH20_R)
        with Locations(Location((10.825317547, 29.44999983, 0), (0, 0, 270))):
            Circle(SKETCH20_R)
        with Locations(Location((10.825317547, 16.94999983, 0), (0, 0, 270))):
            Circle(SKETCH20_R)
        with Locations(Location((0, 10.69999983, 0), (0, 0, 270))):
            Circle(SKETCH20_R)
        with Locations(Location((-10.825317547, 16.94999983, 0), (0, 0, 270))):
            Circle(SKETCH20_R)
    extrude(amount=-CUT_EXTRUDE12_DEPTH, mode=Mode.SUBTRACT)

    # Sketch21 → Cut-Extrude13 (cut, through all)
    with BuildSketch(Plane(origin=(0, 1, 0), x_dir=(1, 0, 0), z_dir=(0, 1, 0))):
        with Locations((0, 23.19999983)):
            Rectangle(SKETCH21_W, SKETCH21_H)
        with BuildLine():
            Line((-31, 45.89999966), (-31, 0.5))
            ThreePointArc((-31, 0.5), (-30.414213562, -0.914213562), (-29, -1.5))
            Line((-29, -1.5), (29, -1.5))
            ThreePointArc((29, -1.5), (30.414213562, -0.914213562), (31, 0.5))
            Line((31, 0.5), (31, 45.89999966))
            ThreePointArc((31, 45.89999966), (30.414213562, 47.314213222), (29, 47.89999966))
            Line((29, 47.89999966), (-29, 47.89999966))
            ThreePointArc((-29, 47.89999966), (-30.414213562, 47.314213222), (-31, 45.89999966))
        make_face(mode=Mode.SUBTRACT)
    extrude(amount=-CUT_EXTRUDE13_DEPTH, mode=Mode.SUBTRACT)

    # Move Face14: a face moved inward by 1.0
    extrude(part_1.faces().sort_by_distance((0, -3.1, -32.49999983))[0], amount=MOVE_FACE14_BY, dir=(0, -1, 0), mode=Mode.SUBTRACT)

    # Move Face14 2: a face moved inward by 1.0
    extrude(part_1.faces().sort_by_distance((10.825317547, -3.1, -26.24999983))[0], amount=MOVE_FACE14_2_BY, dir=(0, -1, 0), mode=Mode.SUBTRACT)

    # Move Face14 3: a face moved inward by 1.0
    extrude(part_1.faces().sort_by_distance((0, -3.1, -19.99999983))[0], amount=MOVE_FACE14_3_BY, dir=(0, -1, 0), mode=Mode.SUBTRACT)

    # Move Face14 4: a face moved inward by 1.0
    extrude(part_1.faces().sort_by_distance((-10.825317547, -3.1, -26.24999983))[0], amount=MOVE_FACE14_4_BY, dir=(0, -1, 0), mode=Mode.SUBTRACT)

    # Move Face14 5: a face moved inward by 1.0
    extrude(part_1.faces().sort_by_distance((-10.825317547, -3.1, -13.74999983))[0], amount=MOVE_FACE14_5_BY, dir=(0, -1, 0), mode=Mode.SUBTRACT)

    # Move Face14 6: a face moved inward by 1.0
    extrude(part_1.faces().sort_by_distance((0, -3.1, -7.49999983))[0], amount=MOVE_FACE14_6_BY, dir=(0, -1, 0), mode=Mode.SUBTRACT)

    # Move Face14 7: a face moved inward by 1.0
    extrude(part_1.faces().sort_by_distance((10.825317547, -3.1, -13.74999983))[0], amount=MOVE_FACE14_7_BY, dir=(0, -1, 0), mode=Mode.SUBTRACT)

    # DeleteFace2: read off the stored shape, not the designer's step
    # DeleteFace2 outline → DeleteFace2 (add)
    with BuildSketch(Plane(origin=(0, 0, 0), x_dir=(1, 0, 0), z_dir=(0, 1, 0))):
        with BuildLine():
            Line((22.3, -1.5), (22.8, -1.5))
            ThreePointArc((22.8, -1.5), (22.446446609, -1.353553391), (22.3, -1))
            Line((22.3, -1), (22.3, -1.5))
        make_face()
        with BuildLine():
            Line((-22.8, -1.5), (-22.3, -1.5))
            Line((-22.3, -1.5), (-22.3, -1))
            ThreePointArc((-22.3, -1), (-22.446446609, -1.353553391), (-22.8, -1.5))
        make_face()
    extrude(amount=DELETEFACE2_DEPTH)

    # Sketch23 → Boss-Extrude6 (add)
    with BuildSketch(Plane.XY.offset(1.5)):
        with Locations((0, -2)):
            Rectangle(SKETCH23_W, SKETCH23_H)
    extrude(amount=BOSS_EXTRUDE6_DEPTH)

    # Fillet7
    fillet7_edges = [part_1.edges().sort_by_distance(p)[0] for p in [
        (-22.3, -2, 1.5),
        (22.3, -2, 1.5),
    ]]
    fillet(fillet7_edges, radius=FILLET7_R)

    # Fillet8
    fillet8_edges = [part_1.edges().sort_by_distance(p)[0] for p in [
        (-22.3, -2, 13.5),
        (22.3, -2, 13.5),
    ]]
    fillet(fillet8_edges, radius=FILLET8_R)

    # Move Face15: a face moved outward by 8.0
    extrude(part_1.faces().sort_by_distance((0, -5, -18.515205364))[0], amount=MOVE_FACE15_BY, dir=(0, -1, 0))


solid = part_1.part
